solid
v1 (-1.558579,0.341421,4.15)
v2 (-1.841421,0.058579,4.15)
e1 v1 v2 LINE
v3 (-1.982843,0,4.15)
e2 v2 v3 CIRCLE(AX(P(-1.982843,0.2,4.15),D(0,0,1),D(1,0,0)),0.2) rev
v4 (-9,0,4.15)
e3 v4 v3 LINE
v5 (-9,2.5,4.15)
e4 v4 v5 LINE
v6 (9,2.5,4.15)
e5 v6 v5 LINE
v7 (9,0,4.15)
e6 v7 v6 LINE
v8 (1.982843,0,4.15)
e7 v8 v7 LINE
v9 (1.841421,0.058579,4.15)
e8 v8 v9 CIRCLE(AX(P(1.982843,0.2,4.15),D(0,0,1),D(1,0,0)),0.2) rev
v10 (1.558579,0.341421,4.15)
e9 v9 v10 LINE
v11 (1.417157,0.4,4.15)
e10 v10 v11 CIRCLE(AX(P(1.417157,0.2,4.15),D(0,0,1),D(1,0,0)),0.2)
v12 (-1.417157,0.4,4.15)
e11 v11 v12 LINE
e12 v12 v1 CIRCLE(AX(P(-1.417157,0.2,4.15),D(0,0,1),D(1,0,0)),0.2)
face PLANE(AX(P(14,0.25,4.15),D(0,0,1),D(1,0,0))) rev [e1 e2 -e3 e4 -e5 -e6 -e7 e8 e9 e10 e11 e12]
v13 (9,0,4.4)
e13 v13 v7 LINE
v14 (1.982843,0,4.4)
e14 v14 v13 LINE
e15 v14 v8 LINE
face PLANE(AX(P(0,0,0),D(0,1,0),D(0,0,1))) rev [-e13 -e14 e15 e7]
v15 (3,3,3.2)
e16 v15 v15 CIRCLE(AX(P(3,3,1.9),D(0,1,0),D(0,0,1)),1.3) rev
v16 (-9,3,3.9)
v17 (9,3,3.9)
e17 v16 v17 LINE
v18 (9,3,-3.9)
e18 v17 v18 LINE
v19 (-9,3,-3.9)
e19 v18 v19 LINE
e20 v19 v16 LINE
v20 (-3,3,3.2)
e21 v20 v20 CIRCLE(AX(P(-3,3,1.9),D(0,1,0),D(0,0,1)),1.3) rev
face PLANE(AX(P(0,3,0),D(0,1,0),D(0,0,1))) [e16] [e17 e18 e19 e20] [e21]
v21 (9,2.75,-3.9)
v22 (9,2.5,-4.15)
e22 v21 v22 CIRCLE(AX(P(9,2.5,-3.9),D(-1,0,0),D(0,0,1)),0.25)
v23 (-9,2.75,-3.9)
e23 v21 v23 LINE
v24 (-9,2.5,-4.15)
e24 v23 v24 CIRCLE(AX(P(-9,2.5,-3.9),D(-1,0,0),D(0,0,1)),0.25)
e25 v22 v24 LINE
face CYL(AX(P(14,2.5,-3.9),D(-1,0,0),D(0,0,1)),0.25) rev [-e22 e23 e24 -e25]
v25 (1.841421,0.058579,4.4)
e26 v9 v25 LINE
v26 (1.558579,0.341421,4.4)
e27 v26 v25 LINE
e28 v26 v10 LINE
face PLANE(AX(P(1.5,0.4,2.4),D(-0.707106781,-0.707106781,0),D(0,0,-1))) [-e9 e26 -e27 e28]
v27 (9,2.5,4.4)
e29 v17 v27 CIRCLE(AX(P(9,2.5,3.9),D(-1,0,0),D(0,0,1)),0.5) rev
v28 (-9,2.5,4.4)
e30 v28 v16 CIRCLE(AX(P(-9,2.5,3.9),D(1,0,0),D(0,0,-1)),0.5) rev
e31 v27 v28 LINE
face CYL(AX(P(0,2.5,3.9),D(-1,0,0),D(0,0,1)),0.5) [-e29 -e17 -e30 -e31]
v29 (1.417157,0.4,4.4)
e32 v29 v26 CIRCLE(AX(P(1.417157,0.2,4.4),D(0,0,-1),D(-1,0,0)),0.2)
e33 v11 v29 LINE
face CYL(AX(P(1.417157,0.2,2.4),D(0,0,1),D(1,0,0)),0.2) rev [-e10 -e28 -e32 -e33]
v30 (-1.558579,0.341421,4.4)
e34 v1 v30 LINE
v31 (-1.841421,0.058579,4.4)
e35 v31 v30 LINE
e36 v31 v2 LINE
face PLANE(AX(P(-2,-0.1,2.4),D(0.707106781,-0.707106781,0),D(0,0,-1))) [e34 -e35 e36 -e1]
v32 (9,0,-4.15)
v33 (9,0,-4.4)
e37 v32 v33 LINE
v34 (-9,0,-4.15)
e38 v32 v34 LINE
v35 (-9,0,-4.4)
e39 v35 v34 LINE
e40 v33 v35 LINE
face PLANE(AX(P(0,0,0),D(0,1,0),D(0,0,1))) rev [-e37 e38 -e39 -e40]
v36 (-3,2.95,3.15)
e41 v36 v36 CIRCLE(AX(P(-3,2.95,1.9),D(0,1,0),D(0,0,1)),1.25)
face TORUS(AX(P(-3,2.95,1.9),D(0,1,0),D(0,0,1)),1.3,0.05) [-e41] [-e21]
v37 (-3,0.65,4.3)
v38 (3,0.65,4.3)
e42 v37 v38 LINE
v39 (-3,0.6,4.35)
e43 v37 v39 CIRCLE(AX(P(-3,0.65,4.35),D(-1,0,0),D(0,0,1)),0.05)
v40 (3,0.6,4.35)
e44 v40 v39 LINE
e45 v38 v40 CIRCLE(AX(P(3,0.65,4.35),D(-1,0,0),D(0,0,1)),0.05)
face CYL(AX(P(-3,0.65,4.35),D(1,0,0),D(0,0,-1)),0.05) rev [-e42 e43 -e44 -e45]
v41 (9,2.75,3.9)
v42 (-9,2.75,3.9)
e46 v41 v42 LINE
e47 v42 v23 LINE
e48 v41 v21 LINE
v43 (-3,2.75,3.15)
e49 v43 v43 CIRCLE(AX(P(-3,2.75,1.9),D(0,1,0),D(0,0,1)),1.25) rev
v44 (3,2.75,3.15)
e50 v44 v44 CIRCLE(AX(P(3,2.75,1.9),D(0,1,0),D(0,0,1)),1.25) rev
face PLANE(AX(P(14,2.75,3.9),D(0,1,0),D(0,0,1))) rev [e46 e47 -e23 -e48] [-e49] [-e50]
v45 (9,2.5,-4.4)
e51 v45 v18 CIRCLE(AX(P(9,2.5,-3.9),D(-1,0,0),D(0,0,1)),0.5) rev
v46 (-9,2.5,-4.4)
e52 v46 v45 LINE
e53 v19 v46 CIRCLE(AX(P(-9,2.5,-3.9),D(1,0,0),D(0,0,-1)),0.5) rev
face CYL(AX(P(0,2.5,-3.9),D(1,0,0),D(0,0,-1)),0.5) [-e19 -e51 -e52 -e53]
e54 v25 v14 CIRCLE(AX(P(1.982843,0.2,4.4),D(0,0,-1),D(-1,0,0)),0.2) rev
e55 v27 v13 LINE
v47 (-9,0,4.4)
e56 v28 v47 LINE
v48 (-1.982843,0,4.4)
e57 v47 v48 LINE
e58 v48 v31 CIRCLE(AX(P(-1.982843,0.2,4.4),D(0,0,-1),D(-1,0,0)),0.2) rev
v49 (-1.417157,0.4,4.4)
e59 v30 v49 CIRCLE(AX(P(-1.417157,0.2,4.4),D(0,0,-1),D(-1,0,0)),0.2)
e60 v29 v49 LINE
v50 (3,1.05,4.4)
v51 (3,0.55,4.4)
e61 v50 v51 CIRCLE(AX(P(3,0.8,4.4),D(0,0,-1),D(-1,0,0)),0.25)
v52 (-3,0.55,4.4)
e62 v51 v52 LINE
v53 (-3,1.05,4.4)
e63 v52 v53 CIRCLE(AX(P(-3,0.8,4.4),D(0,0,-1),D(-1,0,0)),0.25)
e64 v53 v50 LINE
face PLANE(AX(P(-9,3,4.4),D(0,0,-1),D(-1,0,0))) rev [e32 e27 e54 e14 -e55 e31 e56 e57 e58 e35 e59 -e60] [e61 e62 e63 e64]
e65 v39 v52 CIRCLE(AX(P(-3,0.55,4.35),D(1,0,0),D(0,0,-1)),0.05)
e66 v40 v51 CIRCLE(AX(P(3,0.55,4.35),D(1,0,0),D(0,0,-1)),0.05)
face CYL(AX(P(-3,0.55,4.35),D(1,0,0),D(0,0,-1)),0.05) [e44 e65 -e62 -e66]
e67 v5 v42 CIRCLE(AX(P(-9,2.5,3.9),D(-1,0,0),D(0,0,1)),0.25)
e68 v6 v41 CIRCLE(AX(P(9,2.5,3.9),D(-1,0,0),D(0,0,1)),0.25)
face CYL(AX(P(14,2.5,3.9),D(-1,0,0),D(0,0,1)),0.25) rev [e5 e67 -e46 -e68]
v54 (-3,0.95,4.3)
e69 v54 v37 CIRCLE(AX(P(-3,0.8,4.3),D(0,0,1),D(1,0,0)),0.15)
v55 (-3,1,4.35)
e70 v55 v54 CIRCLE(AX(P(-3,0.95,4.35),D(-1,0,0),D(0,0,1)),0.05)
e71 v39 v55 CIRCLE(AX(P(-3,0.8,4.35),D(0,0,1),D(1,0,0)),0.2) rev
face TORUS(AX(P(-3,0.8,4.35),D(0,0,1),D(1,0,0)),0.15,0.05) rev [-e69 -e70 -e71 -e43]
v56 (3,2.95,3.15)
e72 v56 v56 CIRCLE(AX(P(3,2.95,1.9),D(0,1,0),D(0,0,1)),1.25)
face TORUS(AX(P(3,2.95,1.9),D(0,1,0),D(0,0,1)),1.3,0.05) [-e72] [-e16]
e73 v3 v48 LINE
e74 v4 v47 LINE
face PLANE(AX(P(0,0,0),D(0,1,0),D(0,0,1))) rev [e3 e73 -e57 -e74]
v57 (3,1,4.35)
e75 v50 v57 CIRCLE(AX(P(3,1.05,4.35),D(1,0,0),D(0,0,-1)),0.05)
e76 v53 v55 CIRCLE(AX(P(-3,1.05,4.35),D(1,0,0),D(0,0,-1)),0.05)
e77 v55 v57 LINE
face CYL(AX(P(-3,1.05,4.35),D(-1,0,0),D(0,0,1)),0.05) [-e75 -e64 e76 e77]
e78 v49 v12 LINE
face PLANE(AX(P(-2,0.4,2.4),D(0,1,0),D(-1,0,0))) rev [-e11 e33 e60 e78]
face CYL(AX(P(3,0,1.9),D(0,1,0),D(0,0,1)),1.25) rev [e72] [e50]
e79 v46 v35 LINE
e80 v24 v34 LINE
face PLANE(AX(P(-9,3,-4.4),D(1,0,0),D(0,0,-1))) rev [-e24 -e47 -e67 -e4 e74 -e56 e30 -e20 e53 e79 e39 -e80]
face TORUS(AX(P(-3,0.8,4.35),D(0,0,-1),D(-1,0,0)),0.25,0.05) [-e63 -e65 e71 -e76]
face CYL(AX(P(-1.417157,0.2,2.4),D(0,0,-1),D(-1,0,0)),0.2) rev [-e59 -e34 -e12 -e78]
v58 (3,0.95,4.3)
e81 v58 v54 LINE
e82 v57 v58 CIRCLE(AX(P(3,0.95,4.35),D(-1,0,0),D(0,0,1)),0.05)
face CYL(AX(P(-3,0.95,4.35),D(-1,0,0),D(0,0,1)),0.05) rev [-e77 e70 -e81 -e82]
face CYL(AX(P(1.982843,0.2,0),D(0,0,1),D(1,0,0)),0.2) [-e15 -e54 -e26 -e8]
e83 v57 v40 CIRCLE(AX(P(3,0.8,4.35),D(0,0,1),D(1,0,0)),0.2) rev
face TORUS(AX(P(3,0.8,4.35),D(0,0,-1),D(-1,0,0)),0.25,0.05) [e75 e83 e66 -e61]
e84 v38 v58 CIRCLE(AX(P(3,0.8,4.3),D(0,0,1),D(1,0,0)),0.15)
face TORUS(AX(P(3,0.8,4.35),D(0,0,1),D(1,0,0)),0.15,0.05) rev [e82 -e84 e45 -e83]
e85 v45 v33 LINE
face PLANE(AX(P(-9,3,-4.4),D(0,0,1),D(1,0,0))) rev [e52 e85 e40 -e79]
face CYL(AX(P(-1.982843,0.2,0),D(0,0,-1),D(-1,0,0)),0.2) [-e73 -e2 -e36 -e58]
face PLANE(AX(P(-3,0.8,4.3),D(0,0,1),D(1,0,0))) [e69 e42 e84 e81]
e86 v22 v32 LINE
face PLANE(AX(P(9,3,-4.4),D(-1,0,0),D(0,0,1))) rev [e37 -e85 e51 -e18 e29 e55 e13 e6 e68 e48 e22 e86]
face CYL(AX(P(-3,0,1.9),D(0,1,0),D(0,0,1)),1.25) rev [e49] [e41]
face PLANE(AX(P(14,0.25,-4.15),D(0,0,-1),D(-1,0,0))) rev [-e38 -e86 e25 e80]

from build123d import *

# Parameters (mm, degrees)
SKETCH1_W           = 18
SKETCH1_H           = 8.8
BOSS_EXTRUDE1_DEPTH = 3
SKETCH2_R           = 1.25
CUT_EXTRUDE1_DEPTH  = 3
FILLET1_R           = 0.5
CUT_EXTRUDE2_DEPTH  = 23
SKETCH4_W           = 4
SKETCH4_H           = 1.424515237
CUT_EXTRUDE3_DEPTH  = 2
CHAMFER1_SIZE       = 0.5
CUT_EXTRUDE4_DEPTH  = 0.1
FILLET2_R           = 0.05
FILLET3_R           = 0.2
FILLET4_R           = 0.05


# Some blends are built 0.0001 mm under size
with BuildPart() as part:
    # Sketch1 → Boss-Extrude1 (new body)
    with BuildSketch(Plane(origin=(0, 0, 0), x_dir=(1, 0, 0), z_dir=(0, 1, 0))):
        Rectangle(SKETCH1_W, SKETCH1_H)
    extrude(amount=BOSS_EXTRUDE1_DEPTH)

    # Sketch2 → Cut-Extrude1 (cut)
    with BuildSketch(Plane(origin=(0, 3, 0), x_dir=(1, 0, 0), z_dir=(0, 1, 0))):
        with Locations(Location((-3, -1.9, 0), (0, 0, 270))):
            Circle(SKETCH2_R)
        with Locations(Location((3, -1.9, 0), (0, 0, 270))):
            Circle(SKETCH2_R)
    extrude(amount=-CUT_EXTRUDE1_DEPTH, mode=Mode.SUBTRACT)

    # Fillet1
    fillet1_edges = [part.edges().sort_by_distance(p)[0] for p in [
        (0, 3, -4.4),
        (0, 3, 4.4),
    ]]
    fillet(fillet1_edges, radius=FILLET1_R)

    # Sketch3 → Cut-Extrude2 (cut)
    with BuildSketch(Plane.ZY.offset(9)):
        with BuildLine():
            Line((-4.15, 0.25), (-4.15, -7.258391717))
            Line((-4.15, -7.258391717), (4.15, -7.258391717))
            Line((4.15, -7.258391717), (4.15, 0.25))
            Line((4.15, 0.25), (4.15, 2.5))
            ThreePointArc((4.15, 2.5), (4.076776695, 2.676776695), (3.9, 2.75))
            Line((3.9, 2.75), (-3.9, 2.75))
            ThreePointArc((-3.9, 2.75), (-4.076776695, 2.676776695), (-4.15, 2.5))
            Line((-4.15, 2.5), (-4.15, 0.25))
        make_face()
    extrude(amount=-CUT_EXTRUDE2_DEPTH, mode=Mode.SUBTRACT)

    # Sketch4 → Cut-Extrude3 (cut)
    with BuildSketch(Plane.XY.offset(4.4)):
        with Locations((0, -0.312257619)):
            Rectangle(SKETCH4_W, SKETCH4_H)
    extrude(amount=-CUT_EXTRUDE3_DEPTH, mode=Mode.SUBTRACT)

    # Chamfer1
    # the kernel refuses this chamfer: 0.5 mm, written as the material it adds along each edge
    with BuildSketch(Plane(origin=(2, 0.4, 4.4), x_dir=(0.027495876610586487, -0.9996219169112968, 0), z_dir=(0, 0, -1))) as chamfer1_piece_1_section:
        Polygon((CHAMFER1_SIZE * 0.999621916911, CHAMFER1_SIZE * 0.0274958766106), (-CHAMFER1_SIZE * 0.0274958766106, CHAMFER1_SIZE * 0.999621916911), (0, 0), align=None)
    chamfer1_piece_1 = extrude(amount=0.25, mode=Mode.PRIVATE)
    chamfer1_piece_1 = split(chamfer1_piece_1, bisect_by=Plane(origin=(1.827140794, 0, 4.275), z_dir=(0, 1, 0)), keep=Keep.TOP, mode=Mode.PRIVATE)
    add(chamfer1_piece_1)
    with BuildSketch(Plane(origin=(-2, 0.4, 4.4), x_dir=(0.9996219169112968, 0.02749587661058639, 0), z_dir=(0, 0, -1))) as chamfer1_piece_2_section:
        Polygon((CHAMFER1_SIZE * 0.999621916911, CHAMFER1_SIZE * 0.0274958766106), (-CHAMFER1_SIZE * 0.0274958766106, CHAMFER1_SIZE * 0.999621916911), (0, 0), align=None)
    chamfer1_piece_2 = extrude(amount=0.25, mode=Mode.PRIVATE)
    chamfer1_piece_2 = split(chamfer1_piece_2, bisect_by=Plane(origin=(-1.827140794, 0, 4.275), z_dir=(0, 1, 0)), keep=Keep.TOP, mode=Mode.PRIVATE)
    add(chamfer1_piece_2)

    # Sketch5 → Cut-Extrude4 (cut)
    with BuildSketch(Plane.XY.offset(4.4)):
        with BuildLine():
            Line((-3, 1), (3, 1))
            ThreePointArc((3, 1), (3.2, 0.8), (3, 0.6))
            Line((3, 0.6), (-3, 0.6))
            ThreePointArc((-3, 0.6), (-3.2, 0.8), (-3, 1))
        make_face()
    extrude(amount=-CUT_EXTRUDE4_DEPTH, mode=Mode.SUBTRACT)

    # Fillet2
    fillet2_edges = [part.edges().sort_by_distance(p)[0] for p in [
        (3.2, 0.8, 4.4),
        (0, 0.6, 4.4),
        (-3.2, 0.8, 4.4),
        (0, 1, 4.3),
        (3.2, 0.8, 4.3),
        (0, 0.6, 4.3),
        (-3.2, 0.8, 4.3),
        (0, 1, 4.4),
    ]]
    fillet(fillet2_edges, radius=FILLET2_R - 0.0001)  # a hair under: the kernel refuses the full size

    # Fillet3
    fillet3_edges = [part.edges().sort_by_distance(p)[0] for p in [
        (-1.5, 0.4, 4.275),
        (1.5, 0.4, 4.275),
        (1.9, 0, 4.275),
        (-1.9, 0, 4.275),
    ]]
    fillet(fillet3_edges, radius=FILLET3_R)

    # Fillet4
    fillet4_edges = [part.edges().sort_by_distance(p)[0] for p in [
        (-3, 3, 0.65),
        (3, 3, 0.65),
    ]]
    fillet(fillet4_edges, radius=FILLET4_R)


solid = part.part
